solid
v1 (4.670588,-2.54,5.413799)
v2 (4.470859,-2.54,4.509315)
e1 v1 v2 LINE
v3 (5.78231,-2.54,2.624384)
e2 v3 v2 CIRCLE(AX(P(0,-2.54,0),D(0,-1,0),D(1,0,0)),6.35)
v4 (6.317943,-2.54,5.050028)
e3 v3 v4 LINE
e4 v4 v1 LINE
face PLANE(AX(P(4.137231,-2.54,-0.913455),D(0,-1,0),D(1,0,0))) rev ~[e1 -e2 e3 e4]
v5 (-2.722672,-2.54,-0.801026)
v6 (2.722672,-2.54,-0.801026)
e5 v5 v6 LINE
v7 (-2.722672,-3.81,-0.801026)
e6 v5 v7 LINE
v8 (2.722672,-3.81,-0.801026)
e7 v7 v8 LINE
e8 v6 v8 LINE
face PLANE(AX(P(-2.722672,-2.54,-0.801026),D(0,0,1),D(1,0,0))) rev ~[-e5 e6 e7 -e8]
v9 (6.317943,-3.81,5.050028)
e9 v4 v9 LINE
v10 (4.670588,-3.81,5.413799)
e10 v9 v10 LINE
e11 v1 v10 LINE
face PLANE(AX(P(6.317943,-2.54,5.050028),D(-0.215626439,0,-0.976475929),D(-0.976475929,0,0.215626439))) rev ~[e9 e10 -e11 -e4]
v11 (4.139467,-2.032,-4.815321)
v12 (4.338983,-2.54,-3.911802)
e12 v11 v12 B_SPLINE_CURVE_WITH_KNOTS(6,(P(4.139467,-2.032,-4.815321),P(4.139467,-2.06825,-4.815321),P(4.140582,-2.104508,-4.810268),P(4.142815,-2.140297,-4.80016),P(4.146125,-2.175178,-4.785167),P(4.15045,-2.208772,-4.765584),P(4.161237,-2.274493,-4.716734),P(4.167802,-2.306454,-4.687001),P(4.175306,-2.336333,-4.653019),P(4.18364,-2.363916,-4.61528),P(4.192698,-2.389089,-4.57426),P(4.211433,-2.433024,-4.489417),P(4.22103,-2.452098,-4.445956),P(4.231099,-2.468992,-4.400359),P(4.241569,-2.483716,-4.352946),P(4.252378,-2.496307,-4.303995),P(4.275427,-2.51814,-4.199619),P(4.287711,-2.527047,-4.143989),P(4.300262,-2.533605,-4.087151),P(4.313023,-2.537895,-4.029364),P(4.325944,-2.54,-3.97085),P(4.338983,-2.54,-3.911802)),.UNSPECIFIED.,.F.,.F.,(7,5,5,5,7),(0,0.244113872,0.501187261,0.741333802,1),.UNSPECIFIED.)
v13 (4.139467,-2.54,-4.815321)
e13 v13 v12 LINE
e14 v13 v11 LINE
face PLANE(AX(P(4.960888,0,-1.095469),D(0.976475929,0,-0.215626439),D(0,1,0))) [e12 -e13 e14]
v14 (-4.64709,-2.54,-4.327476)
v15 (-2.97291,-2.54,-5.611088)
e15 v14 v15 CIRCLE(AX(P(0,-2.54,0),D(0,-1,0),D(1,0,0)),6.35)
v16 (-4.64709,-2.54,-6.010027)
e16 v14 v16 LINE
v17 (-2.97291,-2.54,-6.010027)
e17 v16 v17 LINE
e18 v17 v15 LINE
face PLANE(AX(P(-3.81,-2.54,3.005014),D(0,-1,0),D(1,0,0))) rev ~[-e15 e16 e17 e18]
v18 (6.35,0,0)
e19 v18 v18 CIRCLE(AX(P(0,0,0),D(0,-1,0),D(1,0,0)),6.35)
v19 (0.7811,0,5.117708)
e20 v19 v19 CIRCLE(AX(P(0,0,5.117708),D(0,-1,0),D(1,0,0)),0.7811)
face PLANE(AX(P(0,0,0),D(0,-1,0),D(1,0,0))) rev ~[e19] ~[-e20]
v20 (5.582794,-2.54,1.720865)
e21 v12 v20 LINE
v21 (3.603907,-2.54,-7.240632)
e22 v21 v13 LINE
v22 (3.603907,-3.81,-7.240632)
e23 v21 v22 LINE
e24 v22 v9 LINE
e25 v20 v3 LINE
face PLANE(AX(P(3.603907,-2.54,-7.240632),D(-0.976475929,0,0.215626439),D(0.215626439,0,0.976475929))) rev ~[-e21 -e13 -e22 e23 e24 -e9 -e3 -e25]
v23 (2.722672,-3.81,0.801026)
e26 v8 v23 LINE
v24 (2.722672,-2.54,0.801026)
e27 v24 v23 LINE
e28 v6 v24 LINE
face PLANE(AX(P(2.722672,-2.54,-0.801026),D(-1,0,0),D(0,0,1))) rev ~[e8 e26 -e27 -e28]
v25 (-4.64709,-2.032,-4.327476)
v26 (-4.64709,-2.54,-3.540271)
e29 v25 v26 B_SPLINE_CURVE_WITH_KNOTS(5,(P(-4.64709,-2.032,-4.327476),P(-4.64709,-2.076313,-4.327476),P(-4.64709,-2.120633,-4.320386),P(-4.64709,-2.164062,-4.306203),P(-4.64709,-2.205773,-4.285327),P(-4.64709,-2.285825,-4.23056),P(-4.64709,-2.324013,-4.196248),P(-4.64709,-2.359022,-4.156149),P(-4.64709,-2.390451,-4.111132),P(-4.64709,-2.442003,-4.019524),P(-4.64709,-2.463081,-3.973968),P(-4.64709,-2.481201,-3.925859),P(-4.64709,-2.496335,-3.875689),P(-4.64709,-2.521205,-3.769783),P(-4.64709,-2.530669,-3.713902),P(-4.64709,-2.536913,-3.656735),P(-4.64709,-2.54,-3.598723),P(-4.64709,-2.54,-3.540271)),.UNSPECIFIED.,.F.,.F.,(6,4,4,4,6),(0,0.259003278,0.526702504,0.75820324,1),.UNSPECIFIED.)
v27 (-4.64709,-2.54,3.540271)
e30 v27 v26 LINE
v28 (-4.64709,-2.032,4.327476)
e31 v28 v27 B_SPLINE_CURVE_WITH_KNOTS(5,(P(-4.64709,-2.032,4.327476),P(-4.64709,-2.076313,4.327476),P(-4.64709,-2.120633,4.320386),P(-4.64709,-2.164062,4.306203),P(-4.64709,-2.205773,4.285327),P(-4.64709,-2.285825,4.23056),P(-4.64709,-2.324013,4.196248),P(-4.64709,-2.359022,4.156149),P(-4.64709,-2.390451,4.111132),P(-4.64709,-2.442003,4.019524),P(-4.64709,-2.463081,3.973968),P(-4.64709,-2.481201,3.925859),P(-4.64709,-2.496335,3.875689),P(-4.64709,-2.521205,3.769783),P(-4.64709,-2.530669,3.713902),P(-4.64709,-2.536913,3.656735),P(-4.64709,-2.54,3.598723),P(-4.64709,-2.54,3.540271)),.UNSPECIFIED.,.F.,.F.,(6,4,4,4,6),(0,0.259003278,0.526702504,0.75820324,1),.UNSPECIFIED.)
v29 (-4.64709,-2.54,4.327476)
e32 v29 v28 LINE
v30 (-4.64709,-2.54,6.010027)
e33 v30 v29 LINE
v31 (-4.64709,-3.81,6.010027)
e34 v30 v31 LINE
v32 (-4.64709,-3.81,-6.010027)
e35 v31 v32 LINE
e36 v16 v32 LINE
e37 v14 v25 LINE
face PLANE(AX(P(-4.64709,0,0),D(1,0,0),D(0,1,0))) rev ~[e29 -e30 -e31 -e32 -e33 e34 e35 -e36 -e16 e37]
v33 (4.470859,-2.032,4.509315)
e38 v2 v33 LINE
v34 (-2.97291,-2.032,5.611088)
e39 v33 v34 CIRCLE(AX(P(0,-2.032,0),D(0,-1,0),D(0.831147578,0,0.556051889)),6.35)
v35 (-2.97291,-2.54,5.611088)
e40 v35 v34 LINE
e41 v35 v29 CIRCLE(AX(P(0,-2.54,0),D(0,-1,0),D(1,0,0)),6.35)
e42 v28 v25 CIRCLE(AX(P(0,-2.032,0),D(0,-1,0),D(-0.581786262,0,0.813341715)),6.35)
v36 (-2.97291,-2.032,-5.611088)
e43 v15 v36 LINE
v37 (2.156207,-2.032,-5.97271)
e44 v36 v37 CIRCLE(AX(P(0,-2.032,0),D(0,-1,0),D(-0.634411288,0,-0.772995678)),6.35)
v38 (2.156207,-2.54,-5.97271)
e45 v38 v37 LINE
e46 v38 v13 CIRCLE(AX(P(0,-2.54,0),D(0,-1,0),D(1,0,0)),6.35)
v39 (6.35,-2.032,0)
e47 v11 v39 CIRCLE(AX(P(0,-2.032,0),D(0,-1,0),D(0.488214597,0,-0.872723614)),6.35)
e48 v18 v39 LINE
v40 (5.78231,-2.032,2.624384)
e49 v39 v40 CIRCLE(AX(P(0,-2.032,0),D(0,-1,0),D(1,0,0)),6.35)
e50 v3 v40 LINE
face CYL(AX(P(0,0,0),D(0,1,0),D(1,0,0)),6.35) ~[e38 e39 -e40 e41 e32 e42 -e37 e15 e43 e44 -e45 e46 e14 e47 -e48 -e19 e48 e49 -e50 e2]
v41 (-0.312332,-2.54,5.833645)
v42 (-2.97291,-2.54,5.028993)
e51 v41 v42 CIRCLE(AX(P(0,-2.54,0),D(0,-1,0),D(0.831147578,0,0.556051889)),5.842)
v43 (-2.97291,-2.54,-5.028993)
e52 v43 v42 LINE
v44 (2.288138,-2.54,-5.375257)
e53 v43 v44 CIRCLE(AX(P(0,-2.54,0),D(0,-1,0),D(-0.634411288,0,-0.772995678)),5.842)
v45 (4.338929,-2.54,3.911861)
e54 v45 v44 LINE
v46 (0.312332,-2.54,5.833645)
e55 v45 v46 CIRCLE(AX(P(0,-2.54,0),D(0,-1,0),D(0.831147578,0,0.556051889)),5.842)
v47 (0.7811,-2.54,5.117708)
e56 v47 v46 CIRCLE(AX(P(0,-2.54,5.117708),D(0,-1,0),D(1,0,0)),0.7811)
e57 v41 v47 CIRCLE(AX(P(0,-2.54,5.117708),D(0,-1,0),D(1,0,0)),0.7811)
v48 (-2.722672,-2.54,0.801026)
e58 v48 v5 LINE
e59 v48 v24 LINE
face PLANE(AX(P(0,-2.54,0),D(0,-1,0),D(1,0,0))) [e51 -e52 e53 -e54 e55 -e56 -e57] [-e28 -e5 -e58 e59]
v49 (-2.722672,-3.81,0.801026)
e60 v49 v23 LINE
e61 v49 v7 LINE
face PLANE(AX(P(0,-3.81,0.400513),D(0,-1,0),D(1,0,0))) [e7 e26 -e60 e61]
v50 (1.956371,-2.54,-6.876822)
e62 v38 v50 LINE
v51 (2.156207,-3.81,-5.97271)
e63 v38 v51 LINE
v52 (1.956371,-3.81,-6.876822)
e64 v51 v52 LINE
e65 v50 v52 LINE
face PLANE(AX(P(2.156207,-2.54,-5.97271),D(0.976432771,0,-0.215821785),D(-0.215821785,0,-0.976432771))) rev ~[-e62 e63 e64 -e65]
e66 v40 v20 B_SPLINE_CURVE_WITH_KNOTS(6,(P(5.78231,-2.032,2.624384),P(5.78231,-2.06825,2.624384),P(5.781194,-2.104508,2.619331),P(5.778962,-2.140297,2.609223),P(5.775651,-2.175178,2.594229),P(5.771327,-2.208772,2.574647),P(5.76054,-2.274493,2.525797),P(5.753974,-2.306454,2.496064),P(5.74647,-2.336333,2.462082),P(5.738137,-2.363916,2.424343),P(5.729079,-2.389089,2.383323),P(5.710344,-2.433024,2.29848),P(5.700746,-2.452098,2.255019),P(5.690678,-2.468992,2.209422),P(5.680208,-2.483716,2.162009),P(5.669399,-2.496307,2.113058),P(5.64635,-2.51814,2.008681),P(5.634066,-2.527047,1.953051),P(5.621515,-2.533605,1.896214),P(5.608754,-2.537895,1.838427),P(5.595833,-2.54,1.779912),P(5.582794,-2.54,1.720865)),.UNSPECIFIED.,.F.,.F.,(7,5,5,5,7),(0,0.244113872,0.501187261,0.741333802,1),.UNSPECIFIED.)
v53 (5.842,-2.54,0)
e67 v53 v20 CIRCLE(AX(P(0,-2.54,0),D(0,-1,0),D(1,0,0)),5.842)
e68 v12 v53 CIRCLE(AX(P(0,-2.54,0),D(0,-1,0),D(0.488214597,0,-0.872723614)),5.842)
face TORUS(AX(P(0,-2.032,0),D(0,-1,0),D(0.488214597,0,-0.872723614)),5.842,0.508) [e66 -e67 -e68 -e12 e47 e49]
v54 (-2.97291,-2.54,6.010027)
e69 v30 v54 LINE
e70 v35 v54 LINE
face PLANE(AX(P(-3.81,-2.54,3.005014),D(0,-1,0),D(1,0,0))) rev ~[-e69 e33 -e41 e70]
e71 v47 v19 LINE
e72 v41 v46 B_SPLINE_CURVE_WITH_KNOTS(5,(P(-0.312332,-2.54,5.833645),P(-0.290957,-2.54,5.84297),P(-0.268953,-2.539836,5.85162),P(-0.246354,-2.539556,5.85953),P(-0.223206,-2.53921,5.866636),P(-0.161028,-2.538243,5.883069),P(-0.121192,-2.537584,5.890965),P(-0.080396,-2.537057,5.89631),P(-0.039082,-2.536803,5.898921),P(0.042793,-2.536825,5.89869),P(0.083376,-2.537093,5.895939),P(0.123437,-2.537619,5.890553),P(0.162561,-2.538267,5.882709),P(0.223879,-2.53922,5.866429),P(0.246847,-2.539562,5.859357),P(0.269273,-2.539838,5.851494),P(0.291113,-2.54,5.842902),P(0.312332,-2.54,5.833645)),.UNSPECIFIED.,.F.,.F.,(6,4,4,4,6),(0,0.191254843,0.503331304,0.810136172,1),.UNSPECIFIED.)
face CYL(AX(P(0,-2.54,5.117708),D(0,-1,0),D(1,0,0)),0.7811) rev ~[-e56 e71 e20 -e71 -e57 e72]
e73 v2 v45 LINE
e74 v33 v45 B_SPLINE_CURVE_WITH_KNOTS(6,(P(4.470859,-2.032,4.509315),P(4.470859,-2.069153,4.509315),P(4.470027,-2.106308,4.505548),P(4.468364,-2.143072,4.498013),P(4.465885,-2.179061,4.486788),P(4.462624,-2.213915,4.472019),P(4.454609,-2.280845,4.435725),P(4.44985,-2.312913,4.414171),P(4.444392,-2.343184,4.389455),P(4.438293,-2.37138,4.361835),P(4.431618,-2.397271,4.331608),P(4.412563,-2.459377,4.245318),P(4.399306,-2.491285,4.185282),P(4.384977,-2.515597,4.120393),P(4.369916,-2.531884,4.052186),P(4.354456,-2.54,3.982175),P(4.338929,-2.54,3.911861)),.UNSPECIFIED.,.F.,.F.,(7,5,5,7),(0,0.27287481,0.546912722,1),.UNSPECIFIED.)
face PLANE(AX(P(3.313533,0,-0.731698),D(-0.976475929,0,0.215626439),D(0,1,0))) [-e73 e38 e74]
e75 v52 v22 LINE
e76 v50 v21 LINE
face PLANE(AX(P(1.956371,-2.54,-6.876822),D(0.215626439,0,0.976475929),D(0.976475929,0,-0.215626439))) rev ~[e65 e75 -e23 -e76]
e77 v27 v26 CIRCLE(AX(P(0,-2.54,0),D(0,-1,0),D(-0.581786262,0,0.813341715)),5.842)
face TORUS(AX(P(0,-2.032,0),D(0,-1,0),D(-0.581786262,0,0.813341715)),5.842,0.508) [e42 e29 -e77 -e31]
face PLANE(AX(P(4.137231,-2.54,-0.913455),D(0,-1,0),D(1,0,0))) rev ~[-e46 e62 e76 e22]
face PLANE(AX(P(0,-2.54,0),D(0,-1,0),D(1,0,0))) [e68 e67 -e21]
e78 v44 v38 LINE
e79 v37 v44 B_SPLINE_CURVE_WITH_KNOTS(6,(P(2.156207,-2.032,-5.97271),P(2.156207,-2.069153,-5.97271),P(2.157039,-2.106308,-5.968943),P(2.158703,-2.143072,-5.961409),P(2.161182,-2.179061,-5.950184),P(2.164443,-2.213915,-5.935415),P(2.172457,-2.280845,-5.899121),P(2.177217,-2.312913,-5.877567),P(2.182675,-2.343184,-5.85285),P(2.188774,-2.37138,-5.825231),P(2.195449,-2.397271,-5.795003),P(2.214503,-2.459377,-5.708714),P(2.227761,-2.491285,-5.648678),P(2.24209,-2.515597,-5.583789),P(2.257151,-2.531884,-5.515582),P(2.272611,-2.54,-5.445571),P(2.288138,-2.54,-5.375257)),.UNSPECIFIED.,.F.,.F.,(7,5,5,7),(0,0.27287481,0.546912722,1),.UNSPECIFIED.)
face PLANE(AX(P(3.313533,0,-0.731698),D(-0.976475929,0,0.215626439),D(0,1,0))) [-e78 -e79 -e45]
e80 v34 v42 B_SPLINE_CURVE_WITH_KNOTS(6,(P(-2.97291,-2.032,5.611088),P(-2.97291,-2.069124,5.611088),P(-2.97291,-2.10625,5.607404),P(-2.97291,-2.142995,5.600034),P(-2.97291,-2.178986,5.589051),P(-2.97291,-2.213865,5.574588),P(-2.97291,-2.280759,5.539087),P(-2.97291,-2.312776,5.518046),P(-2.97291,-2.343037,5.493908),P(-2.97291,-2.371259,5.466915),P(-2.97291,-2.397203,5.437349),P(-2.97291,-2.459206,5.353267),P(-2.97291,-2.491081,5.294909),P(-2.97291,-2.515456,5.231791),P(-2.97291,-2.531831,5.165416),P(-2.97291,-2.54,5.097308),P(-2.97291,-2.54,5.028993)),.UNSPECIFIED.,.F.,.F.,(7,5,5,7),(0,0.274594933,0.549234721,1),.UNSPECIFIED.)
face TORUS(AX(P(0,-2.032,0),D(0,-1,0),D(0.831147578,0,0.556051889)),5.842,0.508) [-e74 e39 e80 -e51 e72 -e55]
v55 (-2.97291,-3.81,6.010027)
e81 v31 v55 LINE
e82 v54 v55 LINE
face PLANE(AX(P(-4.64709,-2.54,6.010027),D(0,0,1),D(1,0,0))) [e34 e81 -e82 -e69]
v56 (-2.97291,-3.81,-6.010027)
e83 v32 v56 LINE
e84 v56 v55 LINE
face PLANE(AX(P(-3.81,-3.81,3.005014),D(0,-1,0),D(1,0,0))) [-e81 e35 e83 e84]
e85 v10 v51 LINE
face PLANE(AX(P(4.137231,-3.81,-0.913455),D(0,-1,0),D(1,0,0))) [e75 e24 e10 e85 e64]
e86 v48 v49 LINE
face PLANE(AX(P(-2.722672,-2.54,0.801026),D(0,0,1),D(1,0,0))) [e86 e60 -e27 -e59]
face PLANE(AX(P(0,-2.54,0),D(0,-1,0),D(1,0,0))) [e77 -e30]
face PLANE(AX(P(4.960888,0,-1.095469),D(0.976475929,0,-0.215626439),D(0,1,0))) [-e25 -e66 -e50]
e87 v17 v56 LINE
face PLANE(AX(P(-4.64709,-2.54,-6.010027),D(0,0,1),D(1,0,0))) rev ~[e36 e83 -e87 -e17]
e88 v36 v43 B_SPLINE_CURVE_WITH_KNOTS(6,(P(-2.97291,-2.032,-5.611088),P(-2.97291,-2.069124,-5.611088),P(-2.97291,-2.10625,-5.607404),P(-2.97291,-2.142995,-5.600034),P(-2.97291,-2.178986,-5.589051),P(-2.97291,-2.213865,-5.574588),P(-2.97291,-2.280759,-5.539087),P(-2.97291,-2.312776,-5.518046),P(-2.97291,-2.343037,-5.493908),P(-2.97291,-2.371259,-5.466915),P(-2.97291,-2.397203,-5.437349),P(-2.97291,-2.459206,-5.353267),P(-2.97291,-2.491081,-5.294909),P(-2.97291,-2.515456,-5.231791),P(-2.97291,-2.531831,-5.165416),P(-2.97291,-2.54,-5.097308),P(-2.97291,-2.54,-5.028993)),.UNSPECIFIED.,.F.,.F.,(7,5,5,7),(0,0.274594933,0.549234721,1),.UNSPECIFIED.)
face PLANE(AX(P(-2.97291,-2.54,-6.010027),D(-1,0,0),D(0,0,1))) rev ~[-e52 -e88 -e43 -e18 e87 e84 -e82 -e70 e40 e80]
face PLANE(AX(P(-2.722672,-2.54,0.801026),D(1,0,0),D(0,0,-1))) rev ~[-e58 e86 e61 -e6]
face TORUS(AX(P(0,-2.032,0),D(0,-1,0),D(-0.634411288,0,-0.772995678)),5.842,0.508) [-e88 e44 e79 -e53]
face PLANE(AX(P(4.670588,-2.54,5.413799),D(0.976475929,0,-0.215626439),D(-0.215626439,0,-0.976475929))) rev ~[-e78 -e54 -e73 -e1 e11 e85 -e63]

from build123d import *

# Parameters (mm, degrees)
F0_R          = 6.35
F1_DEPTH      = 2.54
F2_W          = 1.6741803847
F2_H          = 6.0100271367
F3_DEPTH      = 1.27
F4_W          = 5.4453448392
F4_H          = 0.8010258316
F5_DEPTH      = 1.27
F7_DEPTH      = 1.27
F8_R          = 0.7810995879
F9_DEPTH      = 25.4
F10_T4_ANGLE  = 60.776700367
F10_T9_ANGLE  = 70.6868696842
F10_T15_ANGLE = 108.8474457798
F10_T20_ANGLE = 95.5948420913
F10_T26_ANGLE = 35.8710937336


# Not quite as in the source:
# - a fillet or chamfer that OpenCascade refuses, or shapes differently, is made with other operations: its cross-section is extruded or revolved along the edge and cut away or added
# - a feature of the source that left no trace in its solid (it failed there, or was rolled back) is left out


with BuildPart() as f1:
    # F0 (on Front) → F1 (new body)
    with BuildSketch(Plane.XZ):
        Circle(F0_R)
    extrude(amount=F1_DEPTH)

    # F2 (on face) → F3 (join)
    with BuildSketch(Plane.XZ.offset(2.54)):
        with Locations((-3.81, 3.0050135683)):
            Rectangle(F2_W, F2_H)
        with Locations((-3.81, -3.0050135683)):
            Rectangle(F2_W, F2_H)
    extrude(amount=F3_DEPTH)

    # F4 (on face) → F5 (join)
    with BuildSketch(Plane.XZ.offset(2.54)):
        with Locations((0, 0.4005129158)):
            Rectangle(F4_W, F4_H)
        with Locations((0, -0.4005129158)):
            Rectangle(F4_W, F4_H)
    extrude(amount=F5_DEPTH)

    # F6 (on face) → F7 (join)
    with BuildSketch(Plane.XZ.offset(2.54)):
        Polygon((4.6705882996, 5.4137986153), (2.1562074386, -5.9727103966), (1.9563709538, -6.8768215956), (3.6039068937, -7.2406322096), (6.3179433579, 5.0500279438), align=None)
    extrude(amount=F7_DEPTH)

    # F8 (on face) → F9 (cut)
    with BuildSketch(Plane.XZ.offset(2.54)):
        with Locations((0, 5.1177083515)):
            Circle(F8_R)
    extrude(amount=-F9_DEPTH, mode=Mode.SUBTRACT)

    # F10: fillet of radius 0.508 on 5 edges, made by hand


with BuildPart() as f10_tool2:
    # F10_s3 → F10_t4 (revolve)
    with BuildSketch(Plane(origin=(0, 0, 0), x_dir=(0, 1, 0), z_dir=(-0.8727236144, 0, -0.4882145972))):
        with BuildLine():
            ThreePointArc((-2.032, 6.35), (-2.3912102448, 6.2012102448), (-2.54, 5.842))
            Line((-2.54, 5.842), (-2.54, 6.35))
            Line((-2.54, 6.35), (-2.032, 6.35))
        make_face()
    revolve(axis=Axis((0, -2.54, 0), (0, -1, 0)), revolution_arc=F10_T4_ANGLE)

    split(bisect_by=Plane(origin=(4.9608883724, 0, -1.0954685729), x_dir=(0, 1, 0), z_dir=(0.9764759285, 0, -0.2156264386)), keep=Keep.TOP)


with BuildPart() as f1_1:
    add(f1.part)

    # F10_t1: cut F10_tool2
    add(f10_tool2.part, mode=Mode.SUBTRACT)


with BuildPart() as f10_tool7:
    # F10_s8 → F10_t9 (revolve)
    with BuildSketch(Plane(origin=(0, 0, 0), x_dir=(0, 1, 0), z_dir=(-0.7729956778, 0, 0.6344112878))):
        with BuildLine():
            ThreePointArc((-2.032, 6.35), (-2.3912102448, 6.2012102448), (-2.54, 5.842))
            Line((-2.54, 5.842), (-2.54, 6.35))
            Line((-2.54, 6.35), (-2.032, 6.35))
        make_face()
    revolve(axis=Axis((0, -2.54, 0), (0, -1, 0)), revolution_arc=F10_T9_ANGLE)

    split(bisect_by=Plane.YZ.offset(-2.9729098076), keep=Keep.TOP)

    split(bisect_by=Plane(origin=(3.313533314, 0, -0.7316979013), x_dir=(0, 1, 0), z_dir=(-0.9764759285, 0, 0.2156264386)), keep=Keep.TOP)


with BuildPart() as f1_2:
    add(f1_1.part)

    # F10_t6: cut F10_tool7
    add(f10_tool7.part, mode=Mode.SUBTRACT)


with BuildPart() as f10_tool13:
    # F10_s14 → F10_t15 (revolve)
    with BuildSketch(Plane(origin=(0, 0, 0), x_dir=(0, 1, 0), z_dir=(0.813341715, 0, 0.581786262))):
        with BuildLine():
            ThreePointArc((-2.032, 6.35), (-2.3912102448, 6.2012102448), (-2.54, 5.842))
            Line((-2.54, 5.842), (-2.54, 6.35))
            Line((-2.54, 6.35), (-2.032, 6.35))
        make_face()
    revolve(axis=Axis((0, -2.54, 0), (0, -1, 0)), revolution_arc=F10_T15_ANGLE)

    split(bisect_by=Plane.YZ.offset(-4.6470901924), keep=Keep.BOTTOM)


with BuildPart() as f1_3:
    add(f1_2.part)

    # F10_t12: cut F10_tool13
    add(f10_tool13.part, mode=Mode.SUBTRACT)


with BuildPart() as f10_tool18:
    # F10_s19 → F10_t20 (revolve)
    with BuildSketch(Plane(origin=(0, 0, 0), x_dir=(0, 1, 0), z_dir=(0.5560518892, 0, -0.8311475781))):
        with BuildLine():
            ThreePointArc((-2.032, 6.35), (-2.3912102448, 6.2012102448), (-2.54, 5.842))
            Line((-2.54, 5.842), (-2.54, 6.35))
            Line((-2.54, 6.35), (-2.032, 6.35))
        make_face()
    revolve(axis=Axis((0, -2.54, 0), (0, -1, 0)), revolution_arc=F10_T20_ANGLE)

    split(bisect_by=Plane.YZ.offset(-2.9729098076), keep=Keep.TOP)

    split(bisect_by=Plane(origin=(3.313533314, 0, -0.7316979013), x_dir=(0, 1, 0), z_dir=(-0.9764759285, 0, 0.2156264386)), keep=Keep.TOP)


with BuildPart() as f1_4:
    add(f1_3.part)

    # F10_t17: cut F10_tool18
    add(f10_tool18.part, mode=Mode.SUBTRACT)


with BuildPart() as f10_tool24:
    # F10_s25 → F10_t26 (revolve)
    with BuildSketch(Plane.XY):
        with BuildLine():
            ThreePointArc((6.35, -2.032), (6.2012102448, -2.3912102448), (5.842, -2.54))
            Line((5.842, -2.54), (6.35, -2.54))
            Line((6.35, -2.54), (6.35, -2.032))
        make_face()
    revolve(axis=Axis((0, -2.54, 0), (0, -1, 0)), revolution_arc=F10_T26_ANGLE)

    split(bisect_by=Plane(origin=(4.9608883724, 0, -1.0954685729), x_dir=(0, 1, 0), z_dir=(0.9764759285, 0, -0.2156264386)), keep=Keep.TOP)


with BuildPart() as f1_5:
    add(f1_4.part)

    # F10_t23: cut F10_tool24
    add(f10_tool24.part, mode=Mode.SUBTRACT)


solid = f1_5.part
